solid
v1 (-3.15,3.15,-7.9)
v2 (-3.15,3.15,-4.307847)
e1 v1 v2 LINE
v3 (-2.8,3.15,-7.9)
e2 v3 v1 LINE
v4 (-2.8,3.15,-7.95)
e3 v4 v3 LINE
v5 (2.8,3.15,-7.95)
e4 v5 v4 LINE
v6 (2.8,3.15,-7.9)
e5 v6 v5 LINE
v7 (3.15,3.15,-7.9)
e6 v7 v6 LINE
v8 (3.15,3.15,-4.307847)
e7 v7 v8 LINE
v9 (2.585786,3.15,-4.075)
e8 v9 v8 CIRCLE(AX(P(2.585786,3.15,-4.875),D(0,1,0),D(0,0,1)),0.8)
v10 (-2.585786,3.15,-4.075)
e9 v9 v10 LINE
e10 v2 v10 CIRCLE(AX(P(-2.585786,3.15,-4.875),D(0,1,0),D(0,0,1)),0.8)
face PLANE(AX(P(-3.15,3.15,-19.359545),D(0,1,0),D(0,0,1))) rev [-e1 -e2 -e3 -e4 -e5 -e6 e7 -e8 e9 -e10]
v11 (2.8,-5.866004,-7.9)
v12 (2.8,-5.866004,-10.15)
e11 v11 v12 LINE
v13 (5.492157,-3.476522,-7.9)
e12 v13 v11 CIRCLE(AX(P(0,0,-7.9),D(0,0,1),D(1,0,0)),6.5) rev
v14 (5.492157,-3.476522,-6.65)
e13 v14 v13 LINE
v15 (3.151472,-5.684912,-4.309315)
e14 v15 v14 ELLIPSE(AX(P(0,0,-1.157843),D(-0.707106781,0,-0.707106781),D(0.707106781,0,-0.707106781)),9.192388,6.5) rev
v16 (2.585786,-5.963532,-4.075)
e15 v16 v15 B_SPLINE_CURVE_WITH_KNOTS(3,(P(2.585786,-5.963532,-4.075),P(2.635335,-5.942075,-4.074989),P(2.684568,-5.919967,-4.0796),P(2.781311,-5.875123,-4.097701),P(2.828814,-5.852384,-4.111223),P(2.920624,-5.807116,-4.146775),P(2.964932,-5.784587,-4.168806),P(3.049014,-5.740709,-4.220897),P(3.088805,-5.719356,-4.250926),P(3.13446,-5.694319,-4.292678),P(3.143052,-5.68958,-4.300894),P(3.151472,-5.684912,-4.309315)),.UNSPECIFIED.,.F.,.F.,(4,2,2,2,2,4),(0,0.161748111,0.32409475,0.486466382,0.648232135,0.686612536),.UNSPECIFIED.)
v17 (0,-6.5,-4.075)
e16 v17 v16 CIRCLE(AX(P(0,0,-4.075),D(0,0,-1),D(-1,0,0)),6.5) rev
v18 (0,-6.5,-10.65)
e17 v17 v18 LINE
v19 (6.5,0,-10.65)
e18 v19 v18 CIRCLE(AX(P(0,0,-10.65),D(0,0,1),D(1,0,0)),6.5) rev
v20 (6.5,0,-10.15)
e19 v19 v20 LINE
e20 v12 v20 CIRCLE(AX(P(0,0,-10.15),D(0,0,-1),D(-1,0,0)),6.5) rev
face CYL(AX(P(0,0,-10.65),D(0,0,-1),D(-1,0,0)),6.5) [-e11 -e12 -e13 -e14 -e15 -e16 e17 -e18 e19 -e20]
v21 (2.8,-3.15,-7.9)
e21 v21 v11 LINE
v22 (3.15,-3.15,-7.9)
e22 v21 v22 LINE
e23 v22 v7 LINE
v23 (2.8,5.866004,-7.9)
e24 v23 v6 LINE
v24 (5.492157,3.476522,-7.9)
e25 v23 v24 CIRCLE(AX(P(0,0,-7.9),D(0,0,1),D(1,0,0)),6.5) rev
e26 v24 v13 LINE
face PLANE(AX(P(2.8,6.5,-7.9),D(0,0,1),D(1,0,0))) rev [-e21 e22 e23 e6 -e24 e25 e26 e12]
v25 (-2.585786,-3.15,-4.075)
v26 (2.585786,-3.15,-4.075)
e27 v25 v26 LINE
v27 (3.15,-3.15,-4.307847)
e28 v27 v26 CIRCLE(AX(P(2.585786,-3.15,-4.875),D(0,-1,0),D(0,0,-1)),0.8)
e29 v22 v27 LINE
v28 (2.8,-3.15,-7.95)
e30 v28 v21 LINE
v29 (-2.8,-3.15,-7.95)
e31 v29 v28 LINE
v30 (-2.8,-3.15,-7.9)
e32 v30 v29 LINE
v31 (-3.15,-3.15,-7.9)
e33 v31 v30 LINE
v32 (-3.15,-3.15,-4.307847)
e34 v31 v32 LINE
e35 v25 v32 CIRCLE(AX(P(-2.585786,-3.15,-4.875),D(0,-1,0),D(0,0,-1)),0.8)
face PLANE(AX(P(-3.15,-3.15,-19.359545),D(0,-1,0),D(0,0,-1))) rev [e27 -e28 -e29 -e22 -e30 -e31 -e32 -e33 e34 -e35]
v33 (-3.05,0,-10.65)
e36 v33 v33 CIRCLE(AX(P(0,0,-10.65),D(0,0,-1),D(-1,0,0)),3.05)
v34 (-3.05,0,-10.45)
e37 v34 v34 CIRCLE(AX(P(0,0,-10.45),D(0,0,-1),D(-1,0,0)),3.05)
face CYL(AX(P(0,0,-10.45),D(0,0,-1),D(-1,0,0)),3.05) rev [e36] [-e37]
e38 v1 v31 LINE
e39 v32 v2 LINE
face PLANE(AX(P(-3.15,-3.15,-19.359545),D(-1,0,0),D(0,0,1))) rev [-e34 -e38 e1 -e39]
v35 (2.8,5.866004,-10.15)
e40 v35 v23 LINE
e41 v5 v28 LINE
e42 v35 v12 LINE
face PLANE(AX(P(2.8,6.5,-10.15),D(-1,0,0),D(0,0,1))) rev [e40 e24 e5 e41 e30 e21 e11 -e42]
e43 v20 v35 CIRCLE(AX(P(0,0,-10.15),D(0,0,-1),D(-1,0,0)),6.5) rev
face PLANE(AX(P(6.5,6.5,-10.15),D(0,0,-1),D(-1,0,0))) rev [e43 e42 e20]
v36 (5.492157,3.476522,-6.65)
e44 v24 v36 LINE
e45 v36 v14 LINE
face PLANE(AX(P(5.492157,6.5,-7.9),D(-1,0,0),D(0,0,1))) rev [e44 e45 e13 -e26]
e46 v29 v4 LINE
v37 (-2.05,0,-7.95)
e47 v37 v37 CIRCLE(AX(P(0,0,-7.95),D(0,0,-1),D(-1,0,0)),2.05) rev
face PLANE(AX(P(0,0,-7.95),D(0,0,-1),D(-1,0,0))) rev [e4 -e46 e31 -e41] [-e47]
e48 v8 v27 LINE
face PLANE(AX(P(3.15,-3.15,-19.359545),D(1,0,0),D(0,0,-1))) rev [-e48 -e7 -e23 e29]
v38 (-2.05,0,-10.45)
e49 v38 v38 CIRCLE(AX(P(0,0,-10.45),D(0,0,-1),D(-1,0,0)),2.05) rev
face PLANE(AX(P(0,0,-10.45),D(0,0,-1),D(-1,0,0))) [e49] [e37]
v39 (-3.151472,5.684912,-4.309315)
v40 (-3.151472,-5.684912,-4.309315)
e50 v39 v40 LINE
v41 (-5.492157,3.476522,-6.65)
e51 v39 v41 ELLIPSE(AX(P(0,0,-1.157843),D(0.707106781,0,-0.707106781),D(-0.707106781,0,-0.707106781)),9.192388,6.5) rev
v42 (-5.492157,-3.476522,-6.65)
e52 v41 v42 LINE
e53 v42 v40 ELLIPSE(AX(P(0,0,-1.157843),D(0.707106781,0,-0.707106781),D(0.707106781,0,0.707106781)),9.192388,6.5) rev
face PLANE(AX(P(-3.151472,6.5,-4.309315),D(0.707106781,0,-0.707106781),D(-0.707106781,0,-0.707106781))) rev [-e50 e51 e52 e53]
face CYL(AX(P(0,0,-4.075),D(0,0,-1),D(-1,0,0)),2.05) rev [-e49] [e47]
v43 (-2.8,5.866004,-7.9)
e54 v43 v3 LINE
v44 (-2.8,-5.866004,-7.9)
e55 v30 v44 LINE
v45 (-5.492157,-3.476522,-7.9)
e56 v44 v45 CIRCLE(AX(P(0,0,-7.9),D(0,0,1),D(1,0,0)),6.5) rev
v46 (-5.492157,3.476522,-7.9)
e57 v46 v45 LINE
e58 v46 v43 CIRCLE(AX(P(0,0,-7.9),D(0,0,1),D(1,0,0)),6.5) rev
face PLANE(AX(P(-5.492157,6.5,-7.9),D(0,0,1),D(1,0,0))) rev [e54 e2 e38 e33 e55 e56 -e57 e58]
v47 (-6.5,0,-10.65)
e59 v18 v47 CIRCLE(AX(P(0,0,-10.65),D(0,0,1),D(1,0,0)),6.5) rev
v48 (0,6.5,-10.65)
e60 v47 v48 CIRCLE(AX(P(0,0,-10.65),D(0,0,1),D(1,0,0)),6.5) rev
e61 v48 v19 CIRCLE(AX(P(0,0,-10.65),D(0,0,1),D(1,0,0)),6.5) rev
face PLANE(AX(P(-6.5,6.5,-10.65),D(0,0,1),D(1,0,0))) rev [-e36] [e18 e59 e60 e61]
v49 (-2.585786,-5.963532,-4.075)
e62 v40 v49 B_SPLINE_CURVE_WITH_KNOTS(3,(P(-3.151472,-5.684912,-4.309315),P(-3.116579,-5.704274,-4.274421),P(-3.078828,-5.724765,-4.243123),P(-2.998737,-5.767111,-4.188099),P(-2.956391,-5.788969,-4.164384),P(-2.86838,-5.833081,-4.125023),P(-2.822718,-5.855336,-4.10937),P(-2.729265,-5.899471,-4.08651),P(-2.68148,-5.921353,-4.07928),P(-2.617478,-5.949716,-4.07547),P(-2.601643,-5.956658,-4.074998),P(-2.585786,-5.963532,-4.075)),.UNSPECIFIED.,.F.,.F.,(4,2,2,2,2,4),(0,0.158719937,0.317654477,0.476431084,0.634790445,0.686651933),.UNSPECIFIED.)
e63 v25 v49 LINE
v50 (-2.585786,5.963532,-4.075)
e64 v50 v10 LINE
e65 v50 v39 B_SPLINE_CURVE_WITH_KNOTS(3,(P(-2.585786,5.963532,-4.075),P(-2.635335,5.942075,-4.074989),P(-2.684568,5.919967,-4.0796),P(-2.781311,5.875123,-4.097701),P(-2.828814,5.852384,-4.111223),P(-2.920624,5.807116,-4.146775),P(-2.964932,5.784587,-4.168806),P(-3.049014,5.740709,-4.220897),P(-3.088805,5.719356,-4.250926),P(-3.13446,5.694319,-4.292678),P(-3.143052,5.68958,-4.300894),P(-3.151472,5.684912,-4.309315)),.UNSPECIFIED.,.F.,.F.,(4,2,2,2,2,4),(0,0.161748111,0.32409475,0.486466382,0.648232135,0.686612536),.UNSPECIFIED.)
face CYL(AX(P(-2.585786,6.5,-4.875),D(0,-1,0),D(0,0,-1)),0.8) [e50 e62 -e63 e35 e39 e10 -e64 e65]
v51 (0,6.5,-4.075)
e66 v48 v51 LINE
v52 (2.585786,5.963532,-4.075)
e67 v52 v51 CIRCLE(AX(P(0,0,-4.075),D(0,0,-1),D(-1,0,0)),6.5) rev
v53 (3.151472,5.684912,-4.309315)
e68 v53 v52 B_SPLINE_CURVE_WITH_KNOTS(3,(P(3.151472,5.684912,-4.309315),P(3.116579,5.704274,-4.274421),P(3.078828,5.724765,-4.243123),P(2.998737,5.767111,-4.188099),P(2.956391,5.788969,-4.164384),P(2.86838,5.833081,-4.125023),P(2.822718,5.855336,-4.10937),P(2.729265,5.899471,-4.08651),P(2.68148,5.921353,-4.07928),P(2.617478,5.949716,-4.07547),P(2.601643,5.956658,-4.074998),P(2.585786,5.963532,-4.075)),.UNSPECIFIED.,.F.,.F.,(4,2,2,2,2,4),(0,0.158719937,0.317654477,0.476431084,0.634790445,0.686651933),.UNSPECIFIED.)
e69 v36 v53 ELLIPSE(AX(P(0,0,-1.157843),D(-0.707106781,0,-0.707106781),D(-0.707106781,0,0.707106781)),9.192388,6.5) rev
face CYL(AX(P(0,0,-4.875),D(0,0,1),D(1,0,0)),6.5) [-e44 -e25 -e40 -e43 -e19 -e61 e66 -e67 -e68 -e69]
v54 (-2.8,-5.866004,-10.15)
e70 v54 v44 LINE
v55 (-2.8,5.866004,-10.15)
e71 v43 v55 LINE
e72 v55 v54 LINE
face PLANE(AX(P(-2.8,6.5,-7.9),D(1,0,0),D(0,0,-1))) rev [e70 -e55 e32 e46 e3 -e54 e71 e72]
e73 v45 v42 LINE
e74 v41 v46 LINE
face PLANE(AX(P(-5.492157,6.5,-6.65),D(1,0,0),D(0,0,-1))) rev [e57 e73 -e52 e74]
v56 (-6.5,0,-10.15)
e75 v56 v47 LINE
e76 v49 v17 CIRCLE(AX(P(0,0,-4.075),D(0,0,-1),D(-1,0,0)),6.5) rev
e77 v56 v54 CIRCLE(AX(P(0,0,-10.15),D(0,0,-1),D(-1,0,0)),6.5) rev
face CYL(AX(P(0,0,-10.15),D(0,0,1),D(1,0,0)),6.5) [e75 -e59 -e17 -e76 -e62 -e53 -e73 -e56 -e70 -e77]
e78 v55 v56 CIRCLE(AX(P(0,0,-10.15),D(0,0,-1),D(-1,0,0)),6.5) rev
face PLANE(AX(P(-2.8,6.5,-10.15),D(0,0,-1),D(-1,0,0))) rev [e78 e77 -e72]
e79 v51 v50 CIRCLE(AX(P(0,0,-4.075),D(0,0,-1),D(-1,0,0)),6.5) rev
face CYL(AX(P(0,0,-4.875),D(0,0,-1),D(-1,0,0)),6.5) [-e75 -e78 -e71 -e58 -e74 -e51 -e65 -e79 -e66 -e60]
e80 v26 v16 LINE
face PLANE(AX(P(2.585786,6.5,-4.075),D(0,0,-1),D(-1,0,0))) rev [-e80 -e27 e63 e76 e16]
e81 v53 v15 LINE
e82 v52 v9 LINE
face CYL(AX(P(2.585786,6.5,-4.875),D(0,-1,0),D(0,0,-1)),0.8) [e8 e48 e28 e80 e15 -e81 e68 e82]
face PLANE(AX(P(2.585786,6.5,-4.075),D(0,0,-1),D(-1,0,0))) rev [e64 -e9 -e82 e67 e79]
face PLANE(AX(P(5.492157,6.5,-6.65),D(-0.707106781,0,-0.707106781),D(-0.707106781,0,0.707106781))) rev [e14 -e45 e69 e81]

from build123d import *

# Parameters (mm, degrees)
BOSS_EXTRUDE1_DEPTH = 6.5
SKETCH5_R           = 2.05
CUT_EXTRUDE2_DEPTH  = 12.301797423
SKETCH6_R           = 3.05
CUT_EXTRUDE3_DEPTH  = 0.2
FILLET1_R           = 6.5
SKETCH7_W           = 6.3
SKETCH7_H           = 6.3
CUT_EXTRUDE4_DEPTH  = 3.875


with BuildPart() as part:
    # Sketch2 → Boss-Extrude1 (new, symmetric)
    with BuildSketch(Plane(origin=(0, 0, 0), x_dir=(1, 0, 0), z_dir=(0, 1, 0))):
        with BuildLine():
            Line((-2.8, 10), (-2.8, 10.15))
            Line((-2.8, 10.15), (-6.5, 10.15))
            Line((-6.5, 10.15), (-6.5, 10.65))
            Line((-6.5, 10.65), (6.5, 10.65))
            Line((6.5, 10.65), (6.5, 10.15))
            Line((6.5, 10.15), (2.8, 10.15))
            Line((2.8, 10.15), (2.8, 10))
            Line((2.8, 10), (2.8, 7.9))
            Line((2.8, 7.9), (5.492157288, 7.9))
            Line((5.492157288, 7.9), (5.492157288, 6.65))
            Line((5.492157288, 6.65), (3.151471863, 4.309314575))
            ThreePointArc((3.151471863, 4.309314575), (2.891933184, 4.135896374), (2.585786438, 4.075))
            Line((2.585786438, 4.075), (-2.585786438, 4.075))
            ThreePointArc((-2.585786438, 4.075), (-2.891933184, 4.135896374), (-3.151471863, 4.309314575))
            Line((-3.151471863, 4.309314575), (-5.492157288, 6.65))
            Line((-5.492157288, 6.65), (-5.492157288, 7.9))
            Line((-5.492157288, 7.9), (-2.8, 7.9))
            Line((-2.8, 7.9), (-2.8, 10))
        make_face()
    extrude(amount=BOSS_EXTRUDE1_DEPTH, both=True)

    # Sketch5 → Cut-Extrude2 (cut, through all)
    with BuildSketch(Plane(origin=(0, 0, -10.65), x_dir=(-1, 0, 0), z_dir=(0, 0, -1))):
        Circle(SKETCH5_R)
    extrude(amount=-CUT_EXTRUDE2_DEPTH, mode=Mode.SUBTRACT)

    # Sketch6 → Cut-Extrude3 (cut)
    with BuildSketch(Plane(origin=(0, 0, -10.65), x_dir=(-1, 0, 0), z_dir=(0, 0, -1))):
        Circle(SKETCH6_R)
    extrude(amount=-CUT_EXTRUDE3_DEPTH, mode=Mode.SUBTRACT)

    # Fillet1
    fillet1_edges = [part.edges().sort_by_distance(p)[0] for p in [
        (6.5, -6.5, -10.4),
        (-6.5, -6.5, -10.4),
        (6.5, 6.5, -10.4),
        (-6.5, 6.5, -10.4),
    ]]
    fillet(fillet1_edges, radius=FILLET1_R - 0.0001)  # a hair under: the kernel refuses the full size

    # Sketch7 → Cut-Extrude4 (cut)
    with BuildSketch(Plane.XY.offset(-4.075)):
        Rectangle(SKETCH7_W, SKETCH7_H)
    extrude(amount=-CUT_EXTRUDE4_DEPTH, mode=Mode.SUBTRACT)


solid = part.part
